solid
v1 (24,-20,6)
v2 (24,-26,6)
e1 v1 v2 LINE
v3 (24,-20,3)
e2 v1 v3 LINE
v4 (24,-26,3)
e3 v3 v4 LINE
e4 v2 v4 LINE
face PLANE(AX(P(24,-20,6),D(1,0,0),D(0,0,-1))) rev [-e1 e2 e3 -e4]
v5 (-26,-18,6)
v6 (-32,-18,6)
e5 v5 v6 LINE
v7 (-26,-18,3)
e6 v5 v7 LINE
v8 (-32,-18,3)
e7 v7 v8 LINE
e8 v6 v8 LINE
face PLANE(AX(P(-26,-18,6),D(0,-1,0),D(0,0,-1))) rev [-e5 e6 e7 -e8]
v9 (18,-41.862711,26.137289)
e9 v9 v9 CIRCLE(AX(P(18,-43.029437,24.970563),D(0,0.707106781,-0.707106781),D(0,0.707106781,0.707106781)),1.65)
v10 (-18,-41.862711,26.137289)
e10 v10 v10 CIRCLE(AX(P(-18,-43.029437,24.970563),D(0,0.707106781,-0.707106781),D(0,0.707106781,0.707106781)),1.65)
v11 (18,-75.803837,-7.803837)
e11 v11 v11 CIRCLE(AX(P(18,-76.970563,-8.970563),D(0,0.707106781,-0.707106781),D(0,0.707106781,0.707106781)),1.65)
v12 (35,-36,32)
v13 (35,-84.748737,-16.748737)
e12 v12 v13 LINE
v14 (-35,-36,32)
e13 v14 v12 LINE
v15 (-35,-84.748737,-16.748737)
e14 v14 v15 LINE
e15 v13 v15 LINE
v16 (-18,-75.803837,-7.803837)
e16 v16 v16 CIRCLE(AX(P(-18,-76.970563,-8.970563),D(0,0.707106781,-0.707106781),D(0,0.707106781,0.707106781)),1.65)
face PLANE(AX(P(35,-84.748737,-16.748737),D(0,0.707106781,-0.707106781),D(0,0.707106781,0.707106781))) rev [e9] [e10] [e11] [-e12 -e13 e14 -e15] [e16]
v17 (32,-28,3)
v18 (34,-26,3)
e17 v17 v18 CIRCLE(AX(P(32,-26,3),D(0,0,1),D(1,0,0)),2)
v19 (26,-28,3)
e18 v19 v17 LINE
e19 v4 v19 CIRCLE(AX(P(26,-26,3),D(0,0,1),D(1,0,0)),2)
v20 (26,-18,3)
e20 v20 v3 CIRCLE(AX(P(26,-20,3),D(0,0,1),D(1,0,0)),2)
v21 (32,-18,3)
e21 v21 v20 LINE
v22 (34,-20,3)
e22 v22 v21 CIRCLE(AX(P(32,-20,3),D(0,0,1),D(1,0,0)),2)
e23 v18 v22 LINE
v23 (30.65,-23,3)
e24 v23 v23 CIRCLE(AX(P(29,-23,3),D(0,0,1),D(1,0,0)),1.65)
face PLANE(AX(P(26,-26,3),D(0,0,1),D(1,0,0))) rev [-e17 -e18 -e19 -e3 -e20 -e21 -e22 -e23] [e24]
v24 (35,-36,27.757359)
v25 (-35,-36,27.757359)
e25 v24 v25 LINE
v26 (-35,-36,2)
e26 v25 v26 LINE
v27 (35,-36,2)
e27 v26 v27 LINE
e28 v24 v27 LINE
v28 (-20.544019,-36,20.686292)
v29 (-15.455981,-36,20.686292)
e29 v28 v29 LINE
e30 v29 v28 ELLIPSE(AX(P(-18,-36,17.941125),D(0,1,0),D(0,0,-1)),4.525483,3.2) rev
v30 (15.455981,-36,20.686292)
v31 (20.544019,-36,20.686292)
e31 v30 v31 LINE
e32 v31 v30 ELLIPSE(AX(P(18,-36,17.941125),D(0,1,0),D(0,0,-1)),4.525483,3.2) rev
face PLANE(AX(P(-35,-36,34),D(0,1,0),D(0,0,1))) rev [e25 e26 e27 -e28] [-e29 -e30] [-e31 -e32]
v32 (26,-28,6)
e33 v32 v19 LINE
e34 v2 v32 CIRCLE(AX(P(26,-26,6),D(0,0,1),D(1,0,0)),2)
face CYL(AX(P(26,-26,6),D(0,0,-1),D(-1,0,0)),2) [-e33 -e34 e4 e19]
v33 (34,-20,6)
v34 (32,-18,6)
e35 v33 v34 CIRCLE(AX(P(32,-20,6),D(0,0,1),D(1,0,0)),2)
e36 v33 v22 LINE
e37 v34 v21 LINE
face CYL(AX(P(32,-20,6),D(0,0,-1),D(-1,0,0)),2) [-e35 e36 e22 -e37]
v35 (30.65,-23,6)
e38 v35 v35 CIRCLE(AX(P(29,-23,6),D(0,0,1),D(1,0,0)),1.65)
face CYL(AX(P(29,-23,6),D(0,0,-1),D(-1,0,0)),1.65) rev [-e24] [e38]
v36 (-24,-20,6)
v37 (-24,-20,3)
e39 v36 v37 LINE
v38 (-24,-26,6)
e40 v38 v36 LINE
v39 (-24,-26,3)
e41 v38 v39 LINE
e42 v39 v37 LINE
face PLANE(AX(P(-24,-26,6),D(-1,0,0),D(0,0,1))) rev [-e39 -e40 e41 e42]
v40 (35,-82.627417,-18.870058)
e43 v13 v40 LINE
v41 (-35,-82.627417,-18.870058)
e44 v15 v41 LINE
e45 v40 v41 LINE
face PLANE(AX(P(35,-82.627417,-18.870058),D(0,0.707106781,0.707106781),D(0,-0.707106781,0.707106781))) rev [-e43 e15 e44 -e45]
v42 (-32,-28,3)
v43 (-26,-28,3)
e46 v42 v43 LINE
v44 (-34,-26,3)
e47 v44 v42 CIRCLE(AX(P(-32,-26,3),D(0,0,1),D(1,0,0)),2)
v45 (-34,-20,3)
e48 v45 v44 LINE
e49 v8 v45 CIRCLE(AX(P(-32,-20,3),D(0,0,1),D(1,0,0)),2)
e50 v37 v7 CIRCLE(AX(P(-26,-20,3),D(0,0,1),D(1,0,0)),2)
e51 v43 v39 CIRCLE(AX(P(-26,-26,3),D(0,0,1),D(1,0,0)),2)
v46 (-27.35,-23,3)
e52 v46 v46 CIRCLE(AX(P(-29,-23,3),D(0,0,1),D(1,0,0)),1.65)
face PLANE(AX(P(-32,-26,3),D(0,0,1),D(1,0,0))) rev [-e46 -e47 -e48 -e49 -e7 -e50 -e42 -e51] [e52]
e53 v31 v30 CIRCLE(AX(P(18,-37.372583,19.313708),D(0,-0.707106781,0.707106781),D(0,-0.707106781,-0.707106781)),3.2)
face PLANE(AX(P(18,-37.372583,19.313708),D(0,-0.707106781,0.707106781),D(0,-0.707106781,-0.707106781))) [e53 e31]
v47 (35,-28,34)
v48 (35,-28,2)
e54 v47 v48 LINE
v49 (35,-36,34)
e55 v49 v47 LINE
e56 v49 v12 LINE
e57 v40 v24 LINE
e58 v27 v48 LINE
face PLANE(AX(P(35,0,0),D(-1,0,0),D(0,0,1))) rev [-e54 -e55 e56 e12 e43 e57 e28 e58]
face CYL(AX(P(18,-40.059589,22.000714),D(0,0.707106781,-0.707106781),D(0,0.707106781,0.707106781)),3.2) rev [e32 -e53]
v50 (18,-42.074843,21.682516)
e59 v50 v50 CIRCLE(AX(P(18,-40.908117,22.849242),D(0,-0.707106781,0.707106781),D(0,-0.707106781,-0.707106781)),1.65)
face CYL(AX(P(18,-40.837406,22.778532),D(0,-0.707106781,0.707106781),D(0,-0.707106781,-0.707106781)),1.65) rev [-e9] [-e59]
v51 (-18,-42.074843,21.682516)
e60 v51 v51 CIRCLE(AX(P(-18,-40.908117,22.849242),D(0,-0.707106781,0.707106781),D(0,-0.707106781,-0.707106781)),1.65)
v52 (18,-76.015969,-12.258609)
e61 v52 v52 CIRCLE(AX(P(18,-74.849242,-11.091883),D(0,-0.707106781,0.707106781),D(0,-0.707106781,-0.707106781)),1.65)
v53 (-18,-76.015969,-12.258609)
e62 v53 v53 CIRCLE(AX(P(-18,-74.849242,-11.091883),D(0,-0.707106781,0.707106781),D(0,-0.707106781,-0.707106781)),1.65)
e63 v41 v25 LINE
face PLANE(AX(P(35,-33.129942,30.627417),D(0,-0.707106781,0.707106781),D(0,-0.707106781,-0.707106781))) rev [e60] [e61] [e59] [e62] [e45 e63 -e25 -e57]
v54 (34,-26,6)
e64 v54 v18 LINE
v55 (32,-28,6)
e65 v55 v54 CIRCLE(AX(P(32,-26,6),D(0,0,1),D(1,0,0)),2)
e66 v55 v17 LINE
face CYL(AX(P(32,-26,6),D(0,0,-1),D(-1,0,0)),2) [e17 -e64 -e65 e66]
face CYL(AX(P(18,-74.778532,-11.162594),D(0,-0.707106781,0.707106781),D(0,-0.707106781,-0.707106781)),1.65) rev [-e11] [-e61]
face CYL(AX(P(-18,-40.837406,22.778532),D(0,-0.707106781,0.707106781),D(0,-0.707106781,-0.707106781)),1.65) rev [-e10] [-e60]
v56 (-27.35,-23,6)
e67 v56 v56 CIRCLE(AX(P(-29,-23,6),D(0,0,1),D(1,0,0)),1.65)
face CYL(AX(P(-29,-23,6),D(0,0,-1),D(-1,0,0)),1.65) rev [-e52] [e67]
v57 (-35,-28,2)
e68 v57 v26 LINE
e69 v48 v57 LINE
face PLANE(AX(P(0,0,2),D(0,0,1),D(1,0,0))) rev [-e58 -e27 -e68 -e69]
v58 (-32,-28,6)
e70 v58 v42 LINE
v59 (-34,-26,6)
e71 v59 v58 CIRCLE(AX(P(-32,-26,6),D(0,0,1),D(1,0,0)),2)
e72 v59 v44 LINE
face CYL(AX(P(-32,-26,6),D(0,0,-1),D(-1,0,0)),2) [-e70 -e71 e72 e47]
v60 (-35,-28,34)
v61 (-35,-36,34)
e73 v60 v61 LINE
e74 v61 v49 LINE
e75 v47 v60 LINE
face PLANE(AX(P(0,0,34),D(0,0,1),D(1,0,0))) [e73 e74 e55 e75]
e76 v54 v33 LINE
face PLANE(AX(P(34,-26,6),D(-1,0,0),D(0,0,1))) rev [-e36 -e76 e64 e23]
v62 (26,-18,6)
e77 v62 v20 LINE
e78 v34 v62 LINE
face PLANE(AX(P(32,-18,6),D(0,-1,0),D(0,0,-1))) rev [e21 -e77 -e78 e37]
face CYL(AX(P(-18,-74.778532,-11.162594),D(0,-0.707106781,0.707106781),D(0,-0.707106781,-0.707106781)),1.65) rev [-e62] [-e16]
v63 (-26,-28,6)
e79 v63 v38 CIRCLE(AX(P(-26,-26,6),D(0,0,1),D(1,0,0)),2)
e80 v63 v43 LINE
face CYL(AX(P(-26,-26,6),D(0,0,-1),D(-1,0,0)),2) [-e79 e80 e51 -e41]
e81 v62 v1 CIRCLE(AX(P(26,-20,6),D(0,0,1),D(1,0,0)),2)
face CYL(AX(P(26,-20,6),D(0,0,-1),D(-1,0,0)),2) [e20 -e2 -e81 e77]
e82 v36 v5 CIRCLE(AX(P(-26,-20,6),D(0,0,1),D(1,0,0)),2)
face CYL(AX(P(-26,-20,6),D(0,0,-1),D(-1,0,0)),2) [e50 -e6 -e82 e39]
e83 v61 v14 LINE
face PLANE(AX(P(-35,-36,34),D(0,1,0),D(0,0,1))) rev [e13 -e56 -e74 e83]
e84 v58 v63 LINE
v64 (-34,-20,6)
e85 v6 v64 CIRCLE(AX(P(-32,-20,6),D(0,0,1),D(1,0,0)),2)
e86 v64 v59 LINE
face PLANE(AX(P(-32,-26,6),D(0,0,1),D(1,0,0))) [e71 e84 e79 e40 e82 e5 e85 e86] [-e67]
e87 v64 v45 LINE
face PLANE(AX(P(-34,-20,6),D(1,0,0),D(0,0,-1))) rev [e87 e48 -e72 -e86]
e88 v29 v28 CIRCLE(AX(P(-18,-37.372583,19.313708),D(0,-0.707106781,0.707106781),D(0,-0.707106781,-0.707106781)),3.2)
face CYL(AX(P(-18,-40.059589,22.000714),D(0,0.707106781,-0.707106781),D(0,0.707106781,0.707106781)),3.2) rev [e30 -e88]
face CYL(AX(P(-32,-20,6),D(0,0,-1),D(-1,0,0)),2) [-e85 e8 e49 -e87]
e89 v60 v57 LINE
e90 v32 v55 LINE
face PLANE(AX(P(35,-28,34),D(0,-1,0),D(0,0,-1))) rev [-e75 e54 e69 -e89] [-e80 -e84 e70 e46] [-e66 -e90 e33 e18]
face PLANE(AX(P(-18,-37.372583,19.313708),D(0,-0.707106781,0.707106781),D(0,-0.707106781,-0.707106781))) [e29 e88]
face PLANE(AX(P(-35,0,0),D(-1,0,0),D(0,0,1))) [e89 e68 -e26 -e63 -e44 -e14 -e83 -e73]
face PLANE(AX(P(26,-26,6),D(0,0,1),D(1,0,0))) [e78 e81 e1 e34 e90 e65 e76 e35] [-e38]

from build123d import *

# Parameters (mm, degrees)
F_70MM_45_3MM_START   = -35
F_70MM_45_3MM_DEPTH   = 70
EXTRUDE_START         = 2
SKETCH_8_W            = 70
SKETCH_8_H            = 8
EXTRUDE_307_DEPTH     = 32
EXTRUDE_START_2       = 3
SKETCH_9_R            = 1.65
EXTRUDE_M3_1_DEPTH    = 3
SKETCH_10_R           = 1.65
EXTRUDE_M3_1_2_DEPTH  = 3
F_36X48_M3_DEPTH      = 3.1
F_36X48_M3_DEPTH_BACK = 3.1
SKETCH_11_R           = 1.65
CUT_EXTRUDE_START     = -8
SKETCH_12_R           = 3.2
CUT_EXTRUDE_818_DEPTH = 3.8


with BuildPart() as part:
    # 草图1 → 70mm紧凑45度雷达承托面_3mm (new body)
    with BuildSketch(Plane(origin=(0, 0, 0), x_dir=(0, 0, -1), z_dir=(1, 0, 0)).offset(F_70MM_45_3MM_START)):
        Polygon((16.748737342, -84.748737342), (-32.748737342, -35.251262658), (-30.627416998, -33.129942315), (18.870057685, -82.627416998), align=None)
    extrude(amount=F_70MM_45_3MM_DEPTH)

    # 草图8 → Extrude 307 (add)
    with BuildSketch(Plane.XY.offset(EXTRUDE_START)):
        with Locations((0, -32)):
            Rectangle(SKETCH_8_W, SKETCH_8_H)
    extrude(amount=EXTRUDE_307_DEPTH)

    # 草图9 → Extrude M3__-1 (add)
    with BuildSketch(Plane.XY.offset(EXTRUDE_START_2)):
        with BuildLine():
            Line((-32, -28), (-26, -28))
            ThreePointArc((-26, -28), (-24.585786438, -27.414213562), (-24, -26))
            Line((-24, -26), (-24, -20))
            ThreePointArc((-24, -20), (-24.585786438, -18.585786438), (-26, -18))
            Line((-26, -18), (-32, -18))
            ThreePointArc((-32, -18), (-33.414213562, -18.585786438), (-34, -20))
            Line((-34, -20), (-34, -26))
            ThreePointArc((-34, -26), (-33.414213562, -27.414213562), (-32, -28))
        make_face()
        with Locations((-29, -23)):
            Circle(SKETCH_9_R, mode=Mode.SUBTRACT)
    extrude(amount=EXTRUDE_M3_1_DEPTH)

    # 草图10 → Extrude M3__1 2 (add)
    with BuildSketch(Plane.XY.offset(EXTRUDE_START_2)):
        with BuildLine():
            Line((26, -28), (32, -28))
            ThreePointArc((32, -28), (33.414213562, -27.414213562), (34, -26))
            Line((34, -26), (34, -20))
            ThreePointArc((34, -20), (33.414213562, -18.585786438), (32, -18))
            Line((32, -18), (26, -18))
            ThreePointArc((26, -18), (24.585786438, -18.585786438), (24, -20))
            Line((24, -20), (24, -26))
            ThreePointArc((24, -26), (24.585786438, -27.414213562), (26, -28))
        make_face()
        with Locations((29, -23)):
            Circle(SKETCH_10_R, mode=Mode.SUBTRACT)
    extrude(amount=EXTRUDE_M3_1_2_DEPTH)

    # 草图11 → 端口朝下雷达36x48四M3孔 (cut, two sides: drawn at the far end of the back side and taken through both)
    with BuildSketch(Plane(origin=(0, -34, 34), x_dir=(1, 0, 0), z_dir=(0, -0.7071067811865477, 0.7071067811865475)).offset(-F_36X48_M3_DEPTH_BACK)):
        with Locations(Location((-18, -60.769552622, 0), (0, 0, 270))):
            Circle(SKETCH_11_R)
        with Locations(Location((-18, -12.769552622, 0), (0, 0, 270))):
            Circle(SKETCH_11_R)
        with Locations(Location((18, -60.769552622, 0), (0, 0, 270))):
            Circle(SKETCH_11_R)
        with Locations(Location((18, -12.769552622, 0), (0, 0, 270))):
            Circle(SKETCH_11_R)
    extrude(amount=F_36X48_M3_DEPTH + F_36X48_M3_DEPTH_BACK, mode=Mode.SUBTRACT)

    # 草图12 → Cut-Extrude 818 (cut)
    with BuildSketch(Plane(origin=(0, -34, 34), x_dir=(1, 0, 0), z_dir=(0, -0.7071067811865477, 0.7071067811865475)).offset(CUT_EXTRUDE_START)):
        with Locations((-18, -12.769552622)):
            Circle(SKETCH_12_R)
        with Locations((18, -12.769552622)):
            Circle(SKETCH_12_R)
    extrude(amount=CUT_EXTRUDE_818_DEPTH, mode=Mode.SUBTRACT)


solid = part.part
